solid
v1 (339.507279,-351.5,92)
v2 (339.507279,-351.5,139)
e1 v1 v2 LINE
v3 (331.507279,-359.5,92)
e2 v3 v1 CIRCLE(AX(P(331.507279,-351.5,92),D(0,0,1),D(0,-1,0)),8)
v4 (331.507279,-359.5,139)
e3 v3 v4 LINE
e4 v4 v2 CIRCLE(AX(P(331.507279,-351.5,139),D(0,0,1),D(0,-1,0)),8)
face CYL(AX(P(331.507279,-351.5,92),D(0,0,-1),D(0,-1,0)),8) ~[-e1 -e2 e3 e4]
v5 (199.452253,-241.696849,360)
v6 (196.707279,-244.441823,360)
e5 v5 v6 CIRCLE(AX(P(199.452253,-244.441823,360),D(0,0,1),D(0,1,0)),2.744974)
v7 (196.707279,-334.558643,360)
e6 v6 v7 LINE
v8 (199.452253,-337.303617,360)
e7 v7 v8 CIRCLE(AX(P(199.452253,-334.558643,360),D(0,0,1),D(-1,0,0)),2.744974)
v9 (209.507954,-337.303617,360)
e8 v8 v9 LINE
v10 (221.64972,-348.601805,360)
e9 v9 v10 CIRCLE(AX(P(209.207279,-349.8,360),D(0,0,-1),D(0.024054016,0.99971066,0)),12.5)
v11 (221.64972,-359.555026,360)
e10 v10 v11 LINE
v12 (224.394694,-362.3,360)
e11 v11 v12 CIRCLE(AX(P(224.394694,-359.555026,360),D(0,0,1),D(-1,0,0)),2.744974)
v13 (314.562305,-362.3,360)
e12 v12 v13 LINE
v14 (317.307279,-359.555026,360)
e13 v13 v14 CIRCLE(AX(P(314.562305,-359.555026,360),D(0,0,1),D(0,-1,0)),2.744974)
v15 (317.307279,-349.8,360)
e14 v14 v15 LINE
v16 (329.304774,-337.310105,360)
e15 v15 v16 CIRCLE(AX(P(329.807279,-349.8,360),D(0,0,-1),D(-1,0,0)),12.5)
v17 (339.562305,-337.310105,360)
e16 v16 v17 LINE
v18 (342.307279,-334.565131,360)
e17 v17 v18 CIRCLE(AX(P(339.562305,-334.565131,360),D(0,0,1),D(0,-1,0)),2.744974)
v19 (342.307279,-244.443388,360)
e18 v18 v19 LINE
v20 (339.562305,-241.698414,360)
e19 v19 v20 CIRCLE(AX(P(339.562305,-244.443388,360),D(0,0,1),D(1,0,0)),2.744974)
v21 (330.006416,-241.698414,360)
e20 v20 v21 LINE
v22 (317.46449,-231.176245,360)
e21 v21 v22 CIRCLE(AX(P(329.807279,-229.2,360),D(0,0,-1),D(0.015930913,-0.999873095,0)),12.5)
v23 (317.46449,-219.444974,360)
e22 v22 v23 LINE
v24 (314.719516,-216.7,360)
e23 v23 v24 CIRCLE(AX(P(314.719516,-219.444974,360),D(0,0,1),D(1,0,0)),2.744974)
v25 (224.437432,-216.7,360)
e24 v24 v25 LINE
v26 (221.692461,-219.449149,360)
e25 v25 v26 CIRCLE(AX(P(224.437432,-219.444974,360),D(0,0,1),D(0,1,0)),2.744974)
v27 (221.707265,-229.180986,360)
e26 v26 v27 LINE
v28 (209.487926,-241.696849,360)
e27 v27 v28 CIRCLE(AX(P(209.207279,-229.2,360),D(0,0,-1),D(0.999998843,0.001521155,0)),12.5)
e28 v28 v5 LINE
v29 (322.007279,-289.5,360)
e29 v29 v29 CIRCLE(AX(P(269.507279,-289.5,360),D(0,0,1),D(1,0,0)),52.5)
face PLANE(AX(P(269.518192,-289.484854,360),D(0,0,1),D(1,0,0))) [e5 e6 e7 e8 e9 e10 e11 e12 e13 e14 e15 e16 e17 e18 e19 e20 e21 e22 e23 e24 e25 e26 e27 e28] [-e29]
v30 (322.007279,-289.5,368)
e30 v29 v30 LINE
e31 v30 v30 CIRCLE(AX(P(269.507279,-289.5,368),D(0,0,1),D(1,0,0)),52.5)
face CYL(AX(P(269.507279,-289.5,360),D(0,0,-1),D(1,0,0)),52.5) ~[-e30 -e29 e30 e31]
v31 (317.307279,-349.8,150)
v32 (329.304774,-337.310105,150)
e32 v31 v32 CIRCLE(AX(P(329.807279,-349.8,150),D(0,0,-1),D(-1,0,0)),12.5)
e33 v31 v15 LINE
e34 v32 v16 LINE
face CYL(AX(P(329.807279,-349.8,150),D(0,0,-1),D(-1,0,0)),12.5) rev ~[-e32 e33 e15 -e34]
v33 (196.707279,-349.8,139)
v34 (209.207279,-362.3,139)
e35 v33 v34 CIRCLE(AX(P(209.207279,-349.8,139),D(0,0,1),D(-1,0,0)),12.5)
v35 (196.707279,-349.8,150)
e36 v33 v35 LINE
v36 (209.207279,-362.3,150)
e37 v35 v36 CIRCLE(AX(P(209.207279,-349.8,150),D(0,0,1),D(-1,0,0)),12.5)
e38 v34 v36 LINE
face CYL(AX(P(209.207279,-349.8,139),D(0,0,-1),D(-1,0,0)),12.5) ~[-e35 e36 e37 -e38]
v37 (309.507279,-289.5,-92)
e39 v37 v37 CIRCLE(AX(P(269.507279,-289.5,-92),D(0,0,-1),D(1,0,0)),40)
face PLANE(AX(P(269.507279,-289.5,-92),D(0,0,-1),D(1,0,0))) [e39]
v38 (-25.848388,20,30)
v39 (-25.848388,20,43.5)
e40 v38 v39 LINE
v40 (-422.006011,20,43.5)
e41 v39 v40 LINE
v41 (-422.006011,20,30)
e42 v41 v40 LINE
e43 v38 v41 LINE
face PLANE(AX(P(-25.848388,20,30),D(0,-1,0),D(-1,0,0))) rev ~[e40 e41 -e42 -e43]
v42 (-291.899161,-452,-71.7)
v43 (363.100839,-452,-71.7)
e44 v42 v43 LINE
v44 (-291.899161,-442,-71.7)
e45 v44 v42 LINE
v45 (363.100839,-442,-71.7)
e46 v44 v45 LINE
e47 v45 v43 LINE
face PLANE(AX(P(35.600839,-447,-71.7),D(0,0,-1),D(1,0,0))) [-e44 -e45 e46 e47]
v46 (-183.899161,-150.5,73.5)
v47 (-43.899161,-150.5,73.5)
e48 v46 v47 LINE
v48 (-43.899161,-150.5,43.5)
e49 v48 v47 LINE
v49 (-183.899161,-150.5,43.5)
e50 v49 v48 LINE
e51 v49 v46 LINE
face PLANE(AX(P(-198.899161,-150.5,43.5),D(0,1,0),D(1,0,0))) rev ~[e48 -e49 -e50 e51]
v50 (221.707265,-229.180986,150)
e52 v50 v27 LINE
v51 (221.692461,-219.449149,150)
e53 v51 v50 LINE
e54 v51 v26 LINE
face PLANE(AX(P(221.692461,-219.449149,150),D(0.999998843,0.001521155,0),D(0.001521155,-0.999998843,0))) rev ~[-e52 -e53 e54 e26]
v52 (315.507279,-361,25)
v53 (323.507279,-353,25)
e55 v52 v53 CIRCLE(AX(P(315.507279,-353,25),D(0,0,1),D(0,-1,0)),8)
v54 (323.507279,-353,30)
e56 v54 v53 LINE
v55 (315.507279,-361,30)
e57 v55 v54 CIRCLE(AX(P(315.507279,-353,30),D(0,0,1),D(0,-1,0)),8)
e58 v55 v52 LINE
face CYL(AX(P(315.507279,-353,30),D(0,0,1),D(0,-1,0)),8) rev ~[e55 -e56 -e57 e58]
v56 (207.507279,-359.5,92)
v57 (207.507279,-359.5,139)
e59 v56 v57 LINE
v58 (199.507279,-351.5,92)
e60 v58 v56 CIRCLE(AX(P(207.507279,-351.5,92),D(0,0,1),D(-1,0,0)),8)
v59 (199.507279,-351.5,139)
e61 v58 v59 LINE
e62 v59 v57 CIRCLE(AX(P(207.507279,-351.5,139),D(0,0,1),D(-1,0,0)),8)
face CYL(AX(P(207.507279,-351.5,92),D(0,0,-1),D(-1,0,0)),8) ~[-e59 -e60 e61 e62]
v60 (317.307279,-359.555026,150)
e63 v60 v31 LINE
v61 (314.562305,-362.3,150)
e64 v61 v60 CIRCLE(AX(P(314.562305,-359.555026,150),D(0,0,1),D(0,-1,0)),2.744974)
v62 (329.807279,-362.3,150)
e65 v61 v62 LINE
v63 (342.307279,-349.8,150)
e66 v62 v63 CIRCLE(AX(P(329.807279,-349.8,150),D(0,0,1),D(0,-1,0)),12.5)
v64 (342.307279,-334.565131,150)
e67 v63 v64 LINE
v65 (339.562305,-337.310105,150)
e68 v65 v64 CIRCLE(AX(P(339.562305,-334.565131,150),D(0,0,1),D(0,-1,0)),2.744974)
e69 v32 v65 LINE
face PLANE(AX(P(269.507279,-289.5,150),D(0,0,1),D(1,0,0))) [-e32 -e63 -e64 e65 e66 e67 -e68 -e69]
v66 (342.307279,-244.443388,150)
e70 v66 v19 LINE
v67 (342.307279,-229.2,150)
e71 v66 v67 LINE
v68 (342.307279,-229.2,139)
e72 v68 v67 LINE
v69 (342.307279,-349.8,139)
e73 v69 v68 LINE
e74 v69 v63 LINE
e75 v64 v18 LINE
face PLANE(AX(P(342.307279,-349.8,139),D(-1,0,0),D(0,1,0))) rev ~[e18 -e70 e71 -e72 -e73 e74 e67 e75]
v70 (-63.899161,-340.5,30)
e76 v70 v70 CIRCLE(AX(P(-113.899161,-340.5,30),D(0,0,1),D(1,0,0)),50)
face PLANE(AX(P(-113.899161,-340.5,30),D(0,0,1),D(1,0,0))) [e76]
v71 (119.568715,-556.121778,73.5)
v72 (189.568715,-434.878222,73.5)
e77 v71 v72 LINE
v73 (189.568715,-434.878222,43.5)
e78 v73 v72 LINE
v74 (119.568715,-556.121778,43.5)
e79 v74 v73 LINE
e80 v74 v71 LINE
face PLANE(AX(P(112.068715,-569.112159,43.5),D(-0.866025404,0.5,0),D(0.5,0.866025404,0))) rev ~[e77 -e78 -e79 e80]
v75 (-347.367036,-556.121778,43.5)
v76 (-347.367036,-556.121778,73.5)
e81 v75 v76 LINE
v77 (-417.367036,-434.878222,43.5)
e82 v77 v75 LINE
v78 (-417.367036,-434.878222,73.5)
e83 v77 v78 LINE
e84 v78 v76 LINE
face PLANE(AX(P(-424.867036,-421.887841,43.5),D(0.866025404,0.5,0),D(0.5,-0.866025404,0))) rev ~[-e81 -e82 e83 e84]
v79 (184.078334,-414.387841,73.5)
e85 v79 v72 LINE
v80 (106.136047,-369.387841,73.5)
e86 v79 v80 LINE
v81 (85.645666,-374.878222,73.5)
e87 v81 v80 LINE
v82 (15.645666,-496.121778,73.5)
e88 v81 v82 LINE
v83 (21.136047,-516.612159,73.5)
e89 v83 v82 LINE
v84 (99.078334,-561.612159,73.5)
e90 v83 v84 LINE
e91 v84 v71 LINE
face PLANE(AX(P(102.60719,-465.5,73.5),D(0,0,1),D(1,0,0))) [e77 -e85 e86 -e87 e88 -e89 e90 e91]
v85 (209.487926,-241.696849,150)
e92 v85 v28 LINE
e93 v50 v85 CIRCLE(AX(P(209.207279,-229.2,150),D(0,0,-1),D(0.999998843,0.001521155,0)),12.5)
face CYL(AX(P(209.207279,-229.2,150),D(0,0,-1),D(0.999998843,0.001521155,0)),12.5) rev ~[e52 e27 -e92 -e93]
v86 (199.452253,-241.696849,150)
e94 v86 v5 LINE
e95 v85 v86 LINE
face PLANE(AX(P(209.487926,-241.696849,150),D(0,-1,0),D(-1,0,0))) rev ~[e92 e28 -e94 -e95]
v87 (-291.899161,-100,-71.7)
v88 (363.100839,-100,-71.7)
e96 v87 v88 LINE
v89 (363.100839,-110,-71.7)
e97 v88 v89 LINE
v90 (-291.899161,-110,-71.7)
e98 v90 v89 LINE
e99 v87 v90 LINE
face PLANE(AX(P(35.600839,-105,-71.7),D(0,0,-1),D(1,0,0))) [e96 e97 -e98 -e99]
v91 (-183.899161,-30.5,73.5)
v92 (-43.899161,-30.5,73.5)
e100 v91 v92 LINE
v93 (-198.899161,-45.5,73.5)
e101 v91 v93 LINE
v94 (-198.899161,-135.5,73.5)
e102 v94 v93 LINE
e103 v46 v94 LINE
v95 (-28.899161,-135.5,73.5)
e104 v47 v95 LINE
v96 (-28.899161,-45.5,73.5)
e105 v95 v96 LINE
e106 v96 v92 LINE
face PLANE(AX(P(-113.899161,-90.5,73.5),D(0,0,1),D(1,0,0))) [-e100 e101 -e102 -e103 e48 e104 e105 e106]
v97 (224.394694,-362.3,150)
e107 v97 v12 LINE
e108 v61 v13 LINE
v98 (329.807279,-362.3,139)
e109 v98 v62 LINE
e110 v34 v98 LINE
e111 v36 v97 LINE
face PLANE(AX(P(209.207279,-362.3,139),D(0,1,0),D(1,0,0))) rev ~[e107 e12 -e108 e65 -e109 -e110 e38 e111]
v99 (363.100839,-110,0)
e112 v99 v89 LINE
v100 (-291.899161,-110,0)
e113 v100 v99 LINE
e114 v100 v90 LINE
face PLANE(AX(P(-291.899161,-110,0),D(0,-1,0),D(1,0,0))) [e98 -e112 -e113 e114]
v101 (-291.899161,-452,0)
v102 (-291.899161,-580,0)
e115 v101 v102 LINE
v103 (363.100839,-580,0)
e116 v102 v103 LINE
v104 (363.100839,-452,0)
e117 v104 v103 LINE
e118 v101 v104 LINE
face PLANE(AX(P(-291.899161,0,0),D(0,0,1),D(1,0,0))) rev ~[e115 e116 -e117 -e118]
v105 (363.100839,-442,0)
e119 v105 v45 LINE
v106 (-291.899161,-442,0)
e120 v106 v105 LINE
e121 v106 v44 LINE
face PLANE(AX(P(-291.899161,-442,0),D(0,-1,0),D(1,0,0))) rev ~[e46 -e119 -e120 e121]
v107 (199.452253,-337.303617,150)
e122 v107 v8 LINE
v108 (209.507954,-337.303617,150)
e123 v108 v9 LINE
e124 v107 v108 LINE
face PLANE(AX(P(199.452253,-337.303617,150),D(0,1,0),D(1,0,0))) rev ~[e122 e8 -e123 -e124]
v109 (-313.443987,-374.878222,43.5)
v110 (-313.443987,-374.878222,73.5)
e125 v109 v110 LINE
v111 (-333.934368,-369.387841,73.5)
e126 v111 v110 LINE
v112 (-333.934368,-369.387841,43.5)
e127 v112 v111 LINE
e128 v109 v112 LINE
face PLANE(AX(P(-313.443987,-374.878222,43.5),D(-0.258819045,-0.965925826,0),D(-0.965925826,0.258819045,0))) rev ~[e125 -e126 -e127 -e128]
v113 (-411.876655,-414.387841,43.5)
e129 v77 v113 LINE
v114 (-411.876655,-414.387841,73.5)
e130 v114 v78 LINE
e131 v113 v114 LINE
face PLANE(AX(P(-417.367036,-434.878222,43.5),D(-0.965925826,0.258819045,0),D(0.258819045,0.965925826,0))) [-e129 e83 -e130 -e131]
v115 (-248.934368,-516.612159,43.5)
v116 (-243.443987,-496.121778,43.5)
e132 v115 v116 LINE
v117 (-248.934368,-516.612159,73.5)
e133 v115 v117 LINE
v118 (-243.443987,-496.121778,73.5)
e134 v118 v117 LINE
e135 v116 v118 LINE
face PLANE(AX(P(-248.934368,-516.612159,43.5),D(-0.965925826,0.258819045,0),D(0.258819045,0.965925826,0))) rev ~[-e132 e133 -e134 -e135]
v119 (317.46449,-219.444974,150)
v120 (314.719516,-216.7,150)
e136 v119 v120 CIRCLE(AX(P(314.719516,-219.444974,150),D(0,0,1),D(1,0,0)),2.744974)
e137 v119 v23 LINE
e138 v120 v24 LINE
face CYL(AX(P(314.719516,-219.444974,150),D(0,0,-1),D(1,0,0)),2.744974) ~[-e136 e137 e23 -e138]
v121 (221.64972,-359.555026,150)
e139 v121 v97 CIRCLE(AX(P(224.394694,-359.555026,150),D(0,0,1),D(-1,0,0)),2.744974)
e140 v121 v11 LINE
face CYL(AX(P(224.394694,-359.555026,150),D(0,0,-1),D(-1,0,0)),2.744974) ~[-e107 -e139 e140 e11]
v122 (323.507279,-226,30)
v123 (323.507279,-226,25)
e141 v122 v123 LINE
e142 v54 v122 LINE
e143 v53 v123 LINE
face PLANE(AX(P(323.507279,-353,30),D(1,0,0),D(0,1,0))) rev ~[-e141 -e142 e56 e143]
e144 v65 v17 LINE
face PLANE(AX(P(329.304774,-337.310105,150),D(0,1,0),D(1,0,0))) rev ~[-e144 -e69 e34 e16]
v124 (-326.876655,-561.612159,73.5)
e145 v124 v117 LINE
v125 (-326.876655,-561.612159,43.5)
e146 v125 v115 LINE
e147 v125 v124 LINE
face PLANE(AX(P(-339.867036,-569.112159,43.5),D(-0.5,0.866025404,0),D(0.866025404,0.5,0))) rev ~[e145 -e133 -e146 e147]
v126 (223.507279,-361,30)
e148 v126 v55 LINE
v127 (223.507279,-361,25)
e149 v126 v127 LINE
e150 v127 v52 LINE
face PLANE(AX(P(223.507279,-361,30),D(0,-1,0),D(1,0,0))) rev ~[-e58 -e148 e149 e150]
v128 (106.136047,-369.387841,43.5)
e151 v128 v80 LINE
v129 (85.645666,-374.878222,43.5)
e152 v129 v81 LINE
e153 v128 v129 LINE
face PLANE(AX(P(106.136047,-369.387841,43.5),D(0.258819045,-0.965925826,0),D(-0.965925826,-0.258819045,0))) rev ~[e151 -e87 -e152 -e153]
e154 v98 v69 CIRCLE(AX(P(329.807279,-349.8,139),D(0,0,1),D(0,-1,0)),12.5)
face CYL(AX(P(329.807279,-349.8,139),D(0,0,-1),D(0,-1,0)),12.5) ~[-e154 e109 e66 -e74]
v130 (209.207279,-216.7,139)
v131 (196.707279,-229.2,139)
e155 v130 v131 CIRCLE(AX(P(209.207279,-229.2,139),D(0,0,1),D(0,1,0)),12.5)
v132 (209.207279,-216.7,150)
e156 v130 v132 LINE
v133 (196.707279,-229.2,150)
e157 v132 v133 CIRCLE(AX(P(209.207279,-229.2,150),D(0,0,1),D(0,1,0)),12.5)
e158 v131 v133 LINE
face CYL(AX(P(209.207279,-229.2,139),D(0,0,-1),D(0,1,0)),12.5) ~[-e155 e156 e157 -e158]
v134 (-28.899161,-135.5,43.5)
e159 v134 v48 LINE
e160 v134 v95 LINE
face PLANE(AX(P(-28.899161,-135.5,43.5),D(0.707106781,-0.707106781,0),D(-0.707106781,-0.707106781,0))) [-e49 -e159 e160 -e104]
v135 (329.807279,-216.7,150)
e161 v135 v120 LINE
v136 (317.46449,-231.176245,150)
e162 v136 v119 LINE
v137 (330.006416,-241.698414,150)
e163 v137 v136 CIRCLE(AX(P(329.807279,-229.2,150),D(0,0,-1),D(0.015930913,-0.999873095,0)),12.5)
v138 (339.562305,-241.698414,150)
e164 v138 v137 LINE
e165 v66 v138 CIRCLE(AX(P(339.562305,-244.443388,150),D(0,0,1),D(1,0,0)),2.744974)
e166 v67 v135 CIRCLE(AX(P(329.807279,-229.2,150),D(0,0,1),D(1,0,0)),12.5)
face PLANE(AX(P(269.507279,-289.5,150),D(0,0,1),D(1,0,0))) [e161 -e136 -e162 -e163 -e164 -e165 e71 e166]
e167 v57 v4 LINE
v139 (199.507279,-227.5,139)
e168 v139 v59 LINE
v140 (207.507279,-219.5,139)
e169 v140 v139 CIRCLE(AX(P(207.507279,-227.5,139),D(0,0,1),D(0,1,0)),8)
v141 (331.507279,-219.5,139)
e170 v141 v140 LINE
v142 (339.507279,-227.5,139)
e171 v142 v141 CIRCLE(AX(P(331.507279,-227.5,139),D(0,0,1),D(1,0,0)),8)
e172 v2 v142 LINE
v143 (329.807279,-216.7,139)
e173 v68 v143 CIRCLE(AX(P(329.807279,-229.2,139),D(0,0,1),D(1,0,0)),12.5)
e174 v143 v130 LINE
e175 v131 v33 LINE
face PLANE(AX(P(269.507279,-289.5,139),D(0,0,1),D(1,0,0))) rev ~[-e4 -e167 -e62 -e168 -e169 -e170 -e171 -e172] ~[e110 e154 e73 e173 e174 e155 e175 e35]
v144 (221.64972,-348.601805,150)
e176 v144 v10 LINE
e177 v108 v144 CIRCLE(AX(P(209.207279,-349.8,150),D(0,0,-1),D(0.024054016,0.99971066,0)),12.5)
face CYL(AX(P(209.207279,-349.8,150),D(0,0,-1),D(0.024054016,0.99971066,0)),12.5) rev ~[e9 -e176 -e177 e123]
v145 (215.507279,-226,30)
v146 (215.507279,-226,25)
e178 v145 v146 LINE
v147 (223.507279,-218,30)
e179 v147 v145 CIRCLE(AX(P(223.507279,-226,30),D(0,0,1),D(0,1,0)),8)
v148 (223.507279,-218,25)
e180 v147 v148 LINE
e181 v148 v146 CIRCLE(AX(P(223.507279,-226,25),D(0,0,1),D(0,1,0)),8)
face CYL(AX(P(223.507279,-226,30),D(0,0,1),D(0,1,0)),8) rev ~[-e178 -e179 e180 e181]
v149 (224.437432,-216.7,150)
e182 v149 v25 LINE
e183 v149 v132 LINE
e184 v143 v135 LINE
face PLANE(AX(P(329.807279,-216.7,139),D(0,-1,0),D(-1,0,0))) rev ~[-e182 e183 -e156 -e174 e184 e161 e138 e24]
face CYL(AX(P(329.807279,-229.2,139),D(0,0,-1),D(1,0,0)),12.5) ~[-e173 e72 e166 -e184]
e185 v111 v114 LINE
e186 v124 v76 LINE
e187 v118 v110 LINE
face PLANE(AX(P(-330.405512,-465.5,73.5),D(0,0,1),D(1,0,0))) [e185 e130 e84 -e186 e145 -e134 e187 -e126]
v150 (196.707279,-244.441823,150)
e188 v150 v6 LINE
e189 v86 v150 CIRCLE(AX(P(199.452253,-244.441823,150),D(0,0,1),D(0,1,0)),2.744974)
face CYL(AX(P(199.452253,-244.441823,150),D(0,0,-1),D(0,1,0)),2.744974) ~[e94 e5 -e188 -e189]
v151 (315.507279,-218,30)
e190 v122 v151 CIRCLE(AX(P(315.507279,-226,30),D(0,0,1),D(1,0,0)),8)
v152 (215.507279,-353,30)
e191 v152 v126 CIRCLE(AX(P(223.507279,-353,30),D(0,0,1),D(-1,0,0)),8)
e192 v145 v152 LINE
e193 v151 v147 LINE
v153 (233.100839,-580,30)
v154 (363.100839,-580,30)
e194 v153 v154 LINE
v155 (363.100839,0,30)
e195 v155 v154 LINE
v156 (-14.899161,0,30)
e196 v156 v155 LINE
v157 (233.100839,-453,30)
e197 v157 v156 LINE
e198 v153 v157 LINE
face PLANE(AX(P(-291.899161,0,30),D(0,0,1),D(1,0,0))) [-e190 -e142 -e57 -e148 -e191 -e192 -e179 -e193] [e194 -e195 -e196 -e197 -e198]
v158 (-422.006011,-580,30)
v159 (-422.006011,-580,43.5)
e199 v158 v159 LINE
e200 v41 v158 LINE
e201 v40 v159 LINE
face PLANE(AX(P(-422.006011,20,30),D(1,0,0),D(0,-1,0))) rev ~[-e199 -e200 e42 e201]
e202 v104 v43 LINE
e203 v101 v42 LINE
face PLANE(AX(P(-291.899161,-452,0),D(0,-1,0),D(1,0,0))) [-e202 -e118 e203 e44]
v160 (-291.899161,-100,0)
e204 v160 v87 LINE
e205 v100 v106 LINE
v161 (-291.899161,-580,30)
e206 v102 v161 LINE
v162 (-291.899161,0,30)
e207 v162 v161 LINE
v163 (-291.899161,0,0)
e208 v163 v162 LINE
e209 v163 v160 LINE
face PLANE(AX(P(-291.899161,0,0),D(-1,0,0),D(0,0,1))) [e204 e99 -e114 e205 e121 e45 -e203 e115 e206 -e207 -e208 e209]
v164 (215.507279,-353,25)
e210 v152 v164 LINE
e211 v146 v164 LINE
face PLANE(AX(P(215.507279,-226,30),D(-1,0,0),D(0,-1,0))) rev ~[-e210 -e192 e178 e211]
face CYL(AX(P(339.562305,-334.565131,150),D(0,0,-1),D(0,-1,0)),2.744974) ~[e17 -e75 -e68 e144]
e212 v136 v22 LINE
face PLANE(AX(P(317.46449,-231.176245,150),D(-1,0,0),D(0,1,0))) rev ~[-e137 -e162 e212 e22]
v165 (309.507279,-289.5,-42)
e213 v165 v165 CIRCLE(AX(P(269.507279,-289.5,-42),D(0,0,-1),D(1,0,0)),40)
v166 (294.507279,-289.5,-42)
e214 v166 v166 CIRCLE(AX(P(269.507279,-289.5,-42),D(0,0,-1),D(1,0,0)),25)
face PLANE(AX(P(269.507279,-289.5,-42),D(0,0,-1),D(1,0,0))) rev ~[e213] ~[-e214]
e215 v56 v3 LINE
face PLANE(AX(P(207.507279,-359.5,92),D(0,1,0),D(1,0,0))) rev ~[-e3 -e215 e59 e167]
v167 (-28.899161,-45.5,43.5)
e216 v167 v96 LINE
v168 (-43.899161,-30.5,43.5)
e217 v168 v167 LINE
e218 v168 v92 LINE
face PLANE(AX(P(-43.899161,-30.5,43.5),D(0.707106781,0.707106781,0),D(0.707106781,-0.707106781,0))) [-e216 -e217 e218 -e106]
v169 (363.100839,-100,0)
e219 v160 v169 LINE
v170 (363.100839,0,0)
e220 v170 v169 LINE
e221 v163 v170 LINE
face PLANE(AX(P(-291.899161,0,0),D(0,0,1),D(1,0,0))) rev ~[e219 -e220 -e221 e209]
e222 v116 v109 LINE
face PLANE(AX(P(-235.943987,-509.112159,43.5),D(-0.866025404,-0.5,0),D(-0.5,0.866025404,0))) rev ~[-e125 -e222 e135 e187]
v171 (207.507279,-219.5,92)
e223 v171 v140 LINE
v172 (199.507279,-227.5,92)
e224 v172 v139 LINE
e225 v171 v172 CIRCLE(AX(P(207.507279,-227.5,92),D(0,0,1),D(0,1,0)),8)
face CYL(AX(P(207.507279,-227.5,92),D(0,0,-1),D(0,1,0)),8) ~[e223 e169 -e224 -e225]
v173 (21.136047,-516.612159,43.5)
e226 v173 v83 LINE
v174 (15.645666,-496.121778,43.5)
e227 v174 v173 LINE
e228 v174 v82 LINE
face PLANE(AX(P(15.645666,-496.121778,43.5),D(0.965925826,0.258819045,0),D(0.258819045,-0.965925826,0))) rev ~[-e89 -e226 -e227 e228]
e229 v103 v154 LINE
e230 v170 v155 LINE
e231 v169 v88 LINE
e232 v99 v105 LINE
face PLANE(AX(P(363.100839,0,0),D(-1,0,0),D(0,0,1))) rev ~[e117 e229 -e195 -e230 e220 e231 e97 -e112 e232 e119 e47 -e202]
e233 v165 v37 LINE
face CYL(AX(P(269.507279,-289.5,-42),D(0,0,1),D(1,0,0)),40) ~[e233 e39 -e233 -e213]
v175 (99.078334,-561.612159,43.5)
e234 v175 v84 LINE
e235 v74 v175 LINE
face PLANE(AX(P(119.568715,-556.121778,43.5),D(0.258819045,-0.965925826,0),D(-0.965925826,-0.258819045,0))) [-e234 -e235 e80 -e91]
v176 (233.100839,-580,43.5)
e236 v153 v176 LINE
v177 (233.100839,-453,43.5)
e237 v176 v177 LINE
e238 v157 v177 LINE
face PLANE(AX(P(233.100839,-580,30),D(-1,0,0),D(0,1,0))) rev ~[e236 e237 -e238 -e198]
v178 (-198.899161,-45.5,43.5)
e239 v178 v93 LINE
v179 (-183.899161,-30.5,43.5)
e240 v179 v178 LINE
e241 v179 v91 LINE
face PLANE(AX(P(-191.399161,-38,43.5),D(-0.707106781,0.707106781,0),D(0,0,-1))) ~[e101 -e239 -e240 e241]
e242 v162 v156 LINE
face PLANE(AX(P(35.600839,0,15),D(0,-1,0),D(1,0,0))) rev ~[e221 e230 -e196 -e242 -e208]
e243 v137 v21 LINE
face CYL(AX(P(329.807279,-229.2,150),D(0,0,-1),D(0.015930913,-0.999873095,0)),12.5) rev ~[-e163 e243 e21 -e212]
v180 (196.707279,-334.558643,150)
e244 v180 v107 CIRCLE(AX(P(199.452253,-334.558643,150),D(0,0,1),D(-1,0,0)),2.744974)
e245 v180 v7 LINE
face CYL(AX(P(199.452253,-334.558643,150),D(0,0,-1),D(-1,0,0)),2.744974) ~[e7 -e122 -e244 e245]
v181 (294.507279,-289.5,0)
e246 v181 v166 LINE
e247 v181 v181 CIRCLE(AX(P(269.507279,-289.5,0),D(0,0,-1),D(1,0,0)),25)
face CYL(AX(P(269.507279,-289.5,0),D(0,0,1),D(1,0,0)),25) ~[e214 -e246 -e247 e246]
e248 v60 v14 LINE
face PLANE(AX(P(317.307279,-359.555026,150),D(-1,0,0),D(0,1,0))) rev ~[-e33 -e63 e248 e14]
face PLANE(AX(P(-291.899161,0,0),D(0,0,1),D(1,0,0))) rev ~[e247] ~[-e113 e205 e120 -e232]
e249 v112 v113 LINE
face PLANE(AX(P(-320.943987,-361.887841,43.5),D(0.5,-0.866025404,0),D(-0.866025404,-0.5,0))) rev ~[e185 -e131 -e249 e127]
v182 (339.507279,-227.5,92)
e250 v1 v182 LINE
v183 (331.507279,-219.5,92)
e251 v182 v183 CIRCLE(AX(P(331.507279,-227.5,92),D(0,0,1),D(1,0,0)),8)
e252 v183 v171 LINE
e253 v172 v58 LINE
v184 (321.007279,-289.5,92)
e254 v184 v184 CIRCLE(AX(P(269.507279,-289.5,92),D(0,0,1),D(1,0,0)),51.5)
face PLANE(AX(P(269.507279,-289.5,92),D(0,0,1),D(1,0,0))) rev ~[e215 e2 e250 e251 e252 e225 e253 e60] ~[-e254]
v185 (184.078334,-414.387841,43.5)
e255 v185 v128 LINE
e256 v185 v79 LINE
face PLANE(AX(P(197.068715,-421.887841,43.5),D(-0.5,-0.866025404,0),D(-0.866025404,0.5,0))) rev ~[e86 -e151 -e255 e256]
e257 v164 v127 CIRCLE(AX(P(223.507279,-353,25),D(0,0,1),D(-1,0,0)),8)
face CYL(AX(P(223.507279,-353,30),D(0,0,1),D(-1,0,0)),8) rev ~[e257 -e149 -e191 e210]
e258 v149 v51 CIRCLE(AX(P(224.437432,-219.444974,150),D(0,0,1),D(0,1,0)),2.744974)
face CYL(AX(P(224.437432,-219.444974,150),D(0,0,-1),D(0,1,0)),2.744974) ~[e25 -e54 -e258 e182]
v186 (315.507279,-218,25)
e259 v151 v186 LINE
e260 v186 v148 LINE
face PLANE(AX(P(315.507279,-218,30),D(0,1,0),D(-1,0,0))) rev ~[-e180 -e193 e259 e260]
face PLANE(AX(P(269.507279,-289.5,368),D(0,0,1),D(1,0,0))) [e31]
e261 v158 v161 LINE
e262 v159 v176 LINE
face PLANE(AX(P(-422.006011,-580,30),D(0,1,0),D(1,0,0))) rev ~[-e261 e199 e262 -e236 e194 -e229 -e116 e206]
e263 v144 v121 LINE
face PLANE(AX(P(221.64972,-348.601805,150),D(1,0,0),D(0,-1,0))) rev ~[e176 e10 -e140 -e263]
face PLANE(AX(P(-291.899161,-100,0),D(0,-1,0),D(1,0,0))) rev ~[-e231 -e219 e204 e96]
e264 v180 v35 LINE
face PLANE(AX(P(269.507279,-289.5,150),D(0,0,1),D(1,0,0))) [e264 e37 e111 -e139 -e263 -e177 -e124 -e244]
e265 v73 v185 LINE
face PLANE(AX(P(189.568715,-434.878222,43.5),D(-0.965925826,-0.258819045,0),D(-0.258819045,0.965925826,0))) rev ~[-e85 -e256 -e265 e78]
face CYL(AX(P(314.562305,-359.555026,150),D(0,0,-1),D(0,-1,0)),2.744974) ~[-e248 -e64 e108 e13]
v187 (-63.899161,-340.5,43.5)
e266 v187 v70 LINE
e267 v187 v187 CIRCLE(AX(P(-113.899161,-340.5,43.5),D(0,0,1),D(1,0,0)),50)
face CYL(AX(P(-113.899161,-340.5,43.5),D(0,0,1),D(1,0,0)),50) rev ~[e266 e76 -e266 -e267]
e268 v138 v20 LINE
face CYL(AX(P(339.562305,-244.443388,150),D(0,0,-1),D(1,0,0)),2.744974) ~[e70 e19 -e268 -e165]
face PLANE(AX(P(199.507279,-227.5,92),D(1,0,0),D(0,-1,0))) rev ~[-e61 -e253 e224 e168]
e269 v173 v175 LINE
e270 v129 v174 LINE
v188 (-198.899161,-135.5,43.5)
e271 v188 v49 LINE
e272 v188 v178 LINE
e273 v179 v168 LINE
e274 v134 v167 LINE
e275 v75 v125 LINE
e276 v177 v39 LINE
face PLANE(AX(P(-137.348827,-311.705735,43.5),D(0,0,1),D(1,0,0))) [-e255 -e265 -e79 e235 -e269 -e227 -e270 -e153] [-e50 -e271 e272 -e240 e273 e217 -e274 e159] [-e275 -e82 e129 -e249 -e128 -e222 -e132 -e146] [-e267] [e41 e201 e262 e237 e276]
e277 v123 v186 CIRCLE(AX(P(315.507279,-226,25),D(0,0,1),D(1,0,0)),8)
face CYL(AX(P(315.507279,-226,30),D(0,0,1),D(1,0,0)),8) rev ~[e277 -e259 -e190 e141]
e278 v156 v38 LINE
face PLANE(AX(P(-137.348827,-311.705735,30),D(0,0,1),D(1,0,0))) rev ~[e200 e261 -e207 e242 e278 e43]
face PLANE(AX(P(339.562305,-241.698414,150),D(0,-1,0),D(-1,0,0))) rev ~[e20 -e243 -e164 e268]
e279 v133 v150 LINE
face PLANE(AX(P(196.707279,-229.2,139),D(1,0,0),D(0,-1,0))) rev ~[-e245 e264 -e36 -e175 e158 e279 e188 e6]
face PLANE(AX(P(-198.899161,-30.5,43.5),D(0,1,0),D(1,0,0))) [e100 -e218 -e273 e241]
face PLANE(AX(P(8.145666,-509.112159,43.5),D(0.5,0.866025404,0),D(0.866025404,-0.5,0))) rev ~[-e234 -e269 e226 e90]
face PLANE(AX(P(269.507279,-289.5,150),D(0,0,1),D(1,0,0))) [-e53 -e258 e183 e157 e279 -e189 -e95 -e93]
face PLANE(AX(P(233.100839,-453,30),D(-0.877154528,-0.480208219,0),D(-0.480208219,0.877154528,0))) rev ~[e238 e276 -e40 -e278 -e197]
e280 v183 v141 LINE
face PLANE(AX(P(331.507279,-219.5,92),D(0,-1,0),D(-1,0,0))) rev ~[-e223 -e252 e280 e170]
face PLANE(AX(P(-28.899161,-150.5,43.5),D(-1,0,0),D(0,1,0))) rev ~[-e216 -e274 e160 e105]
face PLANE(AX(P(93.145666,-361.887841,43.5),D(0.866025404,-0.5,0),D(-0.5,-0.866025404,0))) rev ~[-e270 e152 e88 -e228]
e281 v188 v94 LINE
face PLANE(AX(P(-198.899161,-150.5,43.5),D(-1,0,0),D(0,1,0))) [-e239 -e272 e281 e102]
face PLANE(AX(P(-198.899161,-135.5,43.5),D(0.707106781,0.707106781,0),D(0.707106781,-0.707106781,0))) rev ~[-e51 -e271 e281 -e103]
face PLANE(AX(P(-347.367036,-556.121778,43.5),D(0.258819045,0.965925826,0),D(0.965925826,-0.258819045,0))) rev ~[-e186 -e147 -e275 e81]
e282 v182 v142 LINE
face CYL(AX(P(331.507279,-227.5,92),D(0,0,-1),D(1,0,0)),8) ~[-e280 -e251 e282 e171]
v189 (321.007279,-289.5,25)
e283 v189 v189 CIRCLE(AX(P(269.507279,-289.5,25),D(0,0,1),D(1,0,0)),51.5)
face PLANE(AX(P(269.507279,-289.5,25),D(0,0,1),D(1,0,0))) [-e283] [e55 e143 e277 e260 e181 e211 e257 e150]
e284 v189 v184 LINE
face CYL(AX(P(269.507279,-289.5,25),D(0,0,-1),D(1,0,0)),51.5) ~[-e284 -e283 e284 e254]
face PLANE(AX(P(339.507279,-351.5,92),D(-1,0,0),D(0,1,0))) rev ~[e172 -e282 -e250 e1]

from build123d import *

# Parameters (mm, degrees)
F0_W         = 655
F0_H         = 30
F1_DEPTH     = 580
F3_DEPTH     = 13.5
F5_DEPTH     = 5
F6_R         = 51.5
F7_DEPTH     = 67
F9_DEPTH     = 47
F11_DEPTH    = 11
F13_DEPTH    = 210
F14_R        = 52.5
F15_DEPTH    = 8
F16_R        = 50
F17_DEPTH    = 13.5
F18_W        = 170
F18_H        = 120
F19_DEPTH    = 30
F20_SIZE     = 15
F21_T1_DEPTH = 68.5752448195
F22_W        = 655
F22_H        = 10
F23_DEPTH    = 71.7
F24_R        = 25
F25_DEPTH    = 42
F26_R        = 40
F27_DEPTH    = 50


# Not quite as in the source:
# - a fillet or chamfer that OpenCascade refuses, or shapes differently, is made with other operations: its cross-section is extruded or revolved along the edge and cut away or added


with BuildPart() as f1:
    # F0 (on Front) → F1 (new body)
    with BuildSketch(Plane.XZ):
        with Locations((35.6008394094, 15)):
            Rectangle(F0_W, F0_H)
    extrude(amount=F1_DEPTH)

    # F2 (on face) → F3 (join)
    with BuildSketch(Plane.XY.offset(30)):
        Polygon((-422.0060110092, -580), (233.1008394094, -580), (233.1008394094, -453), (-25.8483879637, 20), (-422.0060110092, 20), align=None)
    extrude(amount=F3_DEPTH)

    # F4 (on face) → F5 (cut)
    with BuildSketch(Plane.XY.offset(30)):
        with BuildLine():
            Line((315.5072791576, -218), (223.5072791576, -218))
            ThreePointArc((223.5072791576, -218), (217.8504249081, -220.3431457505), (215.5072791576, -226))
            Line((215.5072791576, -226), (215.5072791576, -353))
            ThreePointArc((215.5072791576, -353), (217.8504249081, -358.6568542495), (223.5072791576, -361))
            Line((223.5072791576, -361), (315.5072791576, -361))
            ThreePointArc((315.5072791576, -361), (321.1641334071, -358.6568542495), (323.5072791576, -353))
            Line((323.5072791576, -353), (323.5072791576, -226))
            ThreePointArc((323.5072791576, -226), (321.1641334071, -220.3431457505), (315.5072791576, -218))
        make_face()
    extrude(amount=-F5_DEPTH, mode=Mode.SUBTRACT)

    # F6 (on face) → F7 (join)
    with BuildSketch(Plane.XY.offset(25)):
        with Locations((269.5072791576, -289.5)):
            Circle(F6_R)
    extrude(amount=F7_DEPTH)

    # F8 (on face) → F9 (join)
    with BuildSketch(Plane.XY.offset(92)):
        with BuildLine():
            Line((331.5072791576, -219.5), (207.5072791576, -219.5))
            ThreePointArc((207.5072791576, -219.5), (201.8504249081, -221.8431457505), (199.5072791576, -227.5))
            Line((199.5072791576, -227.5), (199.5072791576, -351.5))
            ThreePointArc((199.5072791576, -351.5), (201.8504249081, -357.1568542495), (207.5072791576, -359.5))
            Line((207.5072791576, -359.5), (331.5072791576, -359.5))
            ThreePointArc((331.5072791576, -359.5), (337.1641334071, -357.1568542495), (339.5072791576, -351.5))
            Line((339.5072791576, -351.5), (339.5072791576, -227.5))
            ThreePointArc((339.5072791576, -227.5), (337.1641334071, -221.8431457505), (331.5072791576, -219.5))
        make_face()
    extrude(amount=F9_DEPTH)

    # F10 (on face) → F11 (join)
    with BuildSketch(Plane.XY.offset(139)):
        with BuildLine():
            Line((329.8072791576, -216.7), (209.2072791576, -216.7))
            ThreePointArc((209.2072791576, -216.7), (200.3684443928, -220.3611652352), (196.7072791576, -229.2))
            Line((196.7072791576, -229.2), (196.7072791576, -349.8))
            ThreePointArc((196.7072791576, -349.8), (200.3684443928, -358.6388347648), (209.2072791576, -362.3))
            Line((209.2072791576, -362.3), (329.8072791576, -362.3))
            ThreePointArc((329.8072791576, -362.3), (338.6461139225, -358.6388347648), (342.3072791576, -349.8))
            Line((342.3072791576, -349.8), (342.3072791576, -229.2))
            ThreePointArc((342.3072791576, -229.2), (338.6461139225, -220.3611652352), (329.8072791576, -216.7))
        make_face()
    extrude(amount=F11_DEPTH)

    # F12 (on face) → F13 (join)
    with BuildSketch(Plane.XY.offset(150)):
        with BuildLine():
            ThreePointArc((221.6497197978, -359.5550261631), (222.4537040204, -361.4960157773), (224.3946936347, -362.3))
            Line((224.3946936347, -362.3), (314.5623053207, -362.3))
            ThreePointArc((314.5623053207, -362.3), (316.503294935, -361.4960157773), (317.3072791576, -359.5550261631))
            Line((317.3072791576, -359.5550261631), (317.3072791576, -349.8))
            ThreePointArc((317.3072791576, -349.8), (320.7925325094, -341.1406499743), (329.3047740164, -337.3101045407))
            ThreePointArc((329.3047740164, -337.3101045407), (329.8072791576, -337.3), (330.3097842989, -337.3101045407))
            Line((330.3097842989, -337.3101045407), (339.5623053207, -337.3101045407))
            ThreePointArc((339.5623053207, -337.3101045407), (341.503294935, -336.5061203181), (342.3072791576, -334.5651307038))
            Line((342.3072791576, -334.5651307038), (342.3072791576, -244.4433875239))
            ThreePointArc((342.3072791576, -244.4433875239), (341.503294935, -242.5023979096), (339.5623053207, -241.698413687))
            Line((339.5623053207, -241.698413687), (330.006415567, -241.698413687))
            ThreePointArc((330.006415567, -241.698413687), (321.7732212328, -238.7762160199), (317.4644895357, -231.1762450125))
            ThreePointArc((317.4644895357, -231.1762450125), (317.3072791576, -229.2), (317.4644895357, -227.2237549875))
            Line((317.4644895357, -227.2237549875), (317.4644895357, -219.4449738369))
            ThreePointArc((317.4644895357, -219.4449738369), (316.6605053131, -217.5039842227), (314.7195156988, -216.7))
            Line((314.7195156988, -216.7), (224.4374317064, -216.7))
            ThreePointArc((224.4374317064, -216.7), (222.4949663799, -217.5054610577), (221.6924610453, -219.4491493681))
            Line((221.6924610453, -219.4491493681), (221.7072646957, -229.18098556))
            ThreePointArc((221.7072646957, -229.18098556), (218.1514308097, -237.9322477762), (209.4879256393, -241.696849105))
            ThreePointArc((209.4879256393, -241.696849105), (209.2072791576, -241.7), (208.926632676, -241.696849105))
            Line((208.926632676, -241.696849105), (199.4522529946, -241.696849105))
            ThreePointArc((199.4522529946, -241.696849105), (197.5112633803, -242.5008333276), (196.7072791576, -244.4418229419))
            Line((196.7072791576, -244.4418229419), (196.7072791576, -334.5586429094))
            ThreePointArc((196.7072791576, -334.5586429094), (197.5112633803, -336.4996325237), (199.4522529946, -337.3036167464))
            Line((199.4522529946, -337.3036167464), (208.906603954, -337.3036167464))
            ThreePointArc((208.906603954, -337.3036167464), (209.2072791576, -337.3), (209.5079543613, -337.3036167464))
            ThreePointArc((209.5079543613, -337.3036167464), (217.722501739, -340.6489899798), (221.6497197978, -348.6018051423))
            ThreePointArc((221.6497197978, -348.6018051423), (221.7072791576, -349.8), (221.6497197978, -350.9981948577))
            Line((221.6497197978, -350.9981948577), (221.6497197978, -359.5550261631))
        make_face()
        with BuildLine():
            Line((221.6497197978, -348.6018051423), (221.6497197978, -350.9981948577))
            ThreePointArc((221.6497197978, -350.9981948577), (221.7072791576, -349.8), (221.6497197978, -348.6018051423))
        make_face()
        with BuildLine():
            ThreePointArc((330.3097842989, -337.3101045407), (329.8072791576, -337.3), (329.3047740164, -337.3101045407))
            Line((329.3047740164, -337.3101045407), (330.3097842989, -337.3101045407))
        make_face()
        with BuildLine():
            Line((208.906603954, -337.3036167464), (209.5079543613, -337.3036167464))
            ThreePointArc((209.5079543613, -337.3036167464), (209.2072791576, -337.3), (208.906603954, -337.3036167464))
        make_face()
        with BuildLine():
            Line((209.4879256393, -241.696849105), (208.926632676, -241.696849105))
            ThreePointArc((208.926632676, -241.696849105), (209.2072791576, -241.7), (209.4879256393, -241.696849105))
        make_face()
        with BuildLine():
            ThreePointArc((317.4644895357, -227.2237549875), (317.3072791576, -229.2), (317.4644895357, -231.1762450125))
            Line((317.4644895357, -231.1762450125), (317.4644895357, -227.2237549875))
        make_face()
    extrude(amount=F13_DEPTH)

    # F14 (on face) → F15 (join)
    with BuildSketch(Plane.XY.offset(360)):
        with Locations((269.5072791576, -289.5)):
            Circle(F14_R)
    extrude(amount=F15_DEPTH)

    # F16 (on face) → F17 (cut)
    with BuildSketch(Plane.XY.offset(43.5)):
        with Locations((-113.8991605906, -340.5)):
            Circle(F16_R)
    extrude(amount=-F17_DEPTH, mode=Mode.SUBTRACT)

    # F18 (on face) → F19 (join)
    with BuildSketch(Plane.XY.offset(43.5)):
        with Locations((-113.8991605906, -90.5)):
            Rectangle(F18_W, F18_H)
        Polygon((-424.8670357638, -421.8878406783), (-339.8670357638, -569.1121593217), (-235.9439873097, -509.1121593217), (-320.9439873097, -361.8878406783), align=None)
        Polygon((112.0687145825, -569.1121593217), (197.0687145825, -421.8878406783), (93.1456661284, -361.8878406783), (8.1456661284, -509.1121593217), align=None)
    extrude(amount=F19_DEPTH)

    # F20
    f20_edges = [f1.edges().sort_by_distance(p)[0] for p in [
        (-198.899161, -30.5, 58.5),
    ]]
    chamfer(f20_edges, length=F20_SIZE)

    # F21: chamfer of 15 on 11 edges, made by hand

    # F21_s2 → F21_t1 (cut)
    with BuildSketch(Plane.XY.offset(43.5)):
        Polygon((-43.8991605906, -30.5), (-28.8991605906, -45.5), (-28.8991605906, -30.5), align=None)
        Polygon((106.1360471852, -369.3878406783), (85.6456661284, -374.8782217351), (93.1456661284, -361.8878406783), align=None)
        Polygon((15.6456661284, -496.1217782649), (21.1360471852, -516.6121593217), (8.1456661284, -509.1121593217), align=None)
        Polygon((119.5687145825, -556.1217782649), (99.0783335258, -561.6121593217), (112.0687145825, -569.1121593217), align=None)
        Polygon((189.5687145825, -434.8782217351), (184.0783335258, -414.3878406783), (197.0687145825, -421.8878406783), align=None)
        Polygon((-28.8991605906, -135.5), (-43.8991605906, -150.5), (-28.8991605906, -150.5), align=None)
        Polygon((-198.8991605906, -135.5), (-183.8991605906, -150.5), (-198.8991605906, -150.5), align=None)
        Polygon((-248.9343683664, -516.6121593217), (-243.4439873097, -496.1217782649), (-235.9439873097, -509.1121593217), align=None)
        Polygon((-347.3670357638, -556.1217782649), (-326.876654707, -561.6121593217), (-339.8670357638, -569.1121593217), align=None)
        Polygon((-417.3670357638, -434.8782217351), (-411.876654707, -414.3878406783), (-424.8670357638, -421.8878406783), align=None)
        Polygon((-313.4439873097, -374.8782217351), (-333.9343683664, -369.3878406783), (-320.9439873097, -361.8878406783), align=None)
    extrude(amount=F21_T1_DEPTH, mode=Mode.SUBTRACT)

    # F22 (on face) → F23 (join)
    with BuildSketch(Plane(origin=(0, 0, 0), x_dir=(1, 0, 0), z_dir=(0, 0, -1))):
        with Locations((35.6008394094, 105)):
            Rectangle(F22_W, F22_H)
        with Locations((35.6008394094, 447)):
            Rectangle(F22_W, F22_H)
    extrude(amount=F23_DEPTH)

    # F24 (on face) → F25 (join)
    with BuildSketch(Plane(origin=(0, 0, 0), x_dir=(1, 0, 0), z_dir=(0, 0, -1))):
        with Locations((269.5072791576, 289.5)):
            Circle(F24_R)
    extrude(amount=F25_DEPTH)

    # F26 (on face) → F27 (join)
    with BuildSketch(Plane(origin=(0, 0, -42), x_dir=(1, 0, 0), z_dir=(0, 0, -1))):
        with Locations((269.5072791576, 289.5)):
            Circle(F26_R)
    extrude(amount=F27_DEPTH)


solid = f1.part
